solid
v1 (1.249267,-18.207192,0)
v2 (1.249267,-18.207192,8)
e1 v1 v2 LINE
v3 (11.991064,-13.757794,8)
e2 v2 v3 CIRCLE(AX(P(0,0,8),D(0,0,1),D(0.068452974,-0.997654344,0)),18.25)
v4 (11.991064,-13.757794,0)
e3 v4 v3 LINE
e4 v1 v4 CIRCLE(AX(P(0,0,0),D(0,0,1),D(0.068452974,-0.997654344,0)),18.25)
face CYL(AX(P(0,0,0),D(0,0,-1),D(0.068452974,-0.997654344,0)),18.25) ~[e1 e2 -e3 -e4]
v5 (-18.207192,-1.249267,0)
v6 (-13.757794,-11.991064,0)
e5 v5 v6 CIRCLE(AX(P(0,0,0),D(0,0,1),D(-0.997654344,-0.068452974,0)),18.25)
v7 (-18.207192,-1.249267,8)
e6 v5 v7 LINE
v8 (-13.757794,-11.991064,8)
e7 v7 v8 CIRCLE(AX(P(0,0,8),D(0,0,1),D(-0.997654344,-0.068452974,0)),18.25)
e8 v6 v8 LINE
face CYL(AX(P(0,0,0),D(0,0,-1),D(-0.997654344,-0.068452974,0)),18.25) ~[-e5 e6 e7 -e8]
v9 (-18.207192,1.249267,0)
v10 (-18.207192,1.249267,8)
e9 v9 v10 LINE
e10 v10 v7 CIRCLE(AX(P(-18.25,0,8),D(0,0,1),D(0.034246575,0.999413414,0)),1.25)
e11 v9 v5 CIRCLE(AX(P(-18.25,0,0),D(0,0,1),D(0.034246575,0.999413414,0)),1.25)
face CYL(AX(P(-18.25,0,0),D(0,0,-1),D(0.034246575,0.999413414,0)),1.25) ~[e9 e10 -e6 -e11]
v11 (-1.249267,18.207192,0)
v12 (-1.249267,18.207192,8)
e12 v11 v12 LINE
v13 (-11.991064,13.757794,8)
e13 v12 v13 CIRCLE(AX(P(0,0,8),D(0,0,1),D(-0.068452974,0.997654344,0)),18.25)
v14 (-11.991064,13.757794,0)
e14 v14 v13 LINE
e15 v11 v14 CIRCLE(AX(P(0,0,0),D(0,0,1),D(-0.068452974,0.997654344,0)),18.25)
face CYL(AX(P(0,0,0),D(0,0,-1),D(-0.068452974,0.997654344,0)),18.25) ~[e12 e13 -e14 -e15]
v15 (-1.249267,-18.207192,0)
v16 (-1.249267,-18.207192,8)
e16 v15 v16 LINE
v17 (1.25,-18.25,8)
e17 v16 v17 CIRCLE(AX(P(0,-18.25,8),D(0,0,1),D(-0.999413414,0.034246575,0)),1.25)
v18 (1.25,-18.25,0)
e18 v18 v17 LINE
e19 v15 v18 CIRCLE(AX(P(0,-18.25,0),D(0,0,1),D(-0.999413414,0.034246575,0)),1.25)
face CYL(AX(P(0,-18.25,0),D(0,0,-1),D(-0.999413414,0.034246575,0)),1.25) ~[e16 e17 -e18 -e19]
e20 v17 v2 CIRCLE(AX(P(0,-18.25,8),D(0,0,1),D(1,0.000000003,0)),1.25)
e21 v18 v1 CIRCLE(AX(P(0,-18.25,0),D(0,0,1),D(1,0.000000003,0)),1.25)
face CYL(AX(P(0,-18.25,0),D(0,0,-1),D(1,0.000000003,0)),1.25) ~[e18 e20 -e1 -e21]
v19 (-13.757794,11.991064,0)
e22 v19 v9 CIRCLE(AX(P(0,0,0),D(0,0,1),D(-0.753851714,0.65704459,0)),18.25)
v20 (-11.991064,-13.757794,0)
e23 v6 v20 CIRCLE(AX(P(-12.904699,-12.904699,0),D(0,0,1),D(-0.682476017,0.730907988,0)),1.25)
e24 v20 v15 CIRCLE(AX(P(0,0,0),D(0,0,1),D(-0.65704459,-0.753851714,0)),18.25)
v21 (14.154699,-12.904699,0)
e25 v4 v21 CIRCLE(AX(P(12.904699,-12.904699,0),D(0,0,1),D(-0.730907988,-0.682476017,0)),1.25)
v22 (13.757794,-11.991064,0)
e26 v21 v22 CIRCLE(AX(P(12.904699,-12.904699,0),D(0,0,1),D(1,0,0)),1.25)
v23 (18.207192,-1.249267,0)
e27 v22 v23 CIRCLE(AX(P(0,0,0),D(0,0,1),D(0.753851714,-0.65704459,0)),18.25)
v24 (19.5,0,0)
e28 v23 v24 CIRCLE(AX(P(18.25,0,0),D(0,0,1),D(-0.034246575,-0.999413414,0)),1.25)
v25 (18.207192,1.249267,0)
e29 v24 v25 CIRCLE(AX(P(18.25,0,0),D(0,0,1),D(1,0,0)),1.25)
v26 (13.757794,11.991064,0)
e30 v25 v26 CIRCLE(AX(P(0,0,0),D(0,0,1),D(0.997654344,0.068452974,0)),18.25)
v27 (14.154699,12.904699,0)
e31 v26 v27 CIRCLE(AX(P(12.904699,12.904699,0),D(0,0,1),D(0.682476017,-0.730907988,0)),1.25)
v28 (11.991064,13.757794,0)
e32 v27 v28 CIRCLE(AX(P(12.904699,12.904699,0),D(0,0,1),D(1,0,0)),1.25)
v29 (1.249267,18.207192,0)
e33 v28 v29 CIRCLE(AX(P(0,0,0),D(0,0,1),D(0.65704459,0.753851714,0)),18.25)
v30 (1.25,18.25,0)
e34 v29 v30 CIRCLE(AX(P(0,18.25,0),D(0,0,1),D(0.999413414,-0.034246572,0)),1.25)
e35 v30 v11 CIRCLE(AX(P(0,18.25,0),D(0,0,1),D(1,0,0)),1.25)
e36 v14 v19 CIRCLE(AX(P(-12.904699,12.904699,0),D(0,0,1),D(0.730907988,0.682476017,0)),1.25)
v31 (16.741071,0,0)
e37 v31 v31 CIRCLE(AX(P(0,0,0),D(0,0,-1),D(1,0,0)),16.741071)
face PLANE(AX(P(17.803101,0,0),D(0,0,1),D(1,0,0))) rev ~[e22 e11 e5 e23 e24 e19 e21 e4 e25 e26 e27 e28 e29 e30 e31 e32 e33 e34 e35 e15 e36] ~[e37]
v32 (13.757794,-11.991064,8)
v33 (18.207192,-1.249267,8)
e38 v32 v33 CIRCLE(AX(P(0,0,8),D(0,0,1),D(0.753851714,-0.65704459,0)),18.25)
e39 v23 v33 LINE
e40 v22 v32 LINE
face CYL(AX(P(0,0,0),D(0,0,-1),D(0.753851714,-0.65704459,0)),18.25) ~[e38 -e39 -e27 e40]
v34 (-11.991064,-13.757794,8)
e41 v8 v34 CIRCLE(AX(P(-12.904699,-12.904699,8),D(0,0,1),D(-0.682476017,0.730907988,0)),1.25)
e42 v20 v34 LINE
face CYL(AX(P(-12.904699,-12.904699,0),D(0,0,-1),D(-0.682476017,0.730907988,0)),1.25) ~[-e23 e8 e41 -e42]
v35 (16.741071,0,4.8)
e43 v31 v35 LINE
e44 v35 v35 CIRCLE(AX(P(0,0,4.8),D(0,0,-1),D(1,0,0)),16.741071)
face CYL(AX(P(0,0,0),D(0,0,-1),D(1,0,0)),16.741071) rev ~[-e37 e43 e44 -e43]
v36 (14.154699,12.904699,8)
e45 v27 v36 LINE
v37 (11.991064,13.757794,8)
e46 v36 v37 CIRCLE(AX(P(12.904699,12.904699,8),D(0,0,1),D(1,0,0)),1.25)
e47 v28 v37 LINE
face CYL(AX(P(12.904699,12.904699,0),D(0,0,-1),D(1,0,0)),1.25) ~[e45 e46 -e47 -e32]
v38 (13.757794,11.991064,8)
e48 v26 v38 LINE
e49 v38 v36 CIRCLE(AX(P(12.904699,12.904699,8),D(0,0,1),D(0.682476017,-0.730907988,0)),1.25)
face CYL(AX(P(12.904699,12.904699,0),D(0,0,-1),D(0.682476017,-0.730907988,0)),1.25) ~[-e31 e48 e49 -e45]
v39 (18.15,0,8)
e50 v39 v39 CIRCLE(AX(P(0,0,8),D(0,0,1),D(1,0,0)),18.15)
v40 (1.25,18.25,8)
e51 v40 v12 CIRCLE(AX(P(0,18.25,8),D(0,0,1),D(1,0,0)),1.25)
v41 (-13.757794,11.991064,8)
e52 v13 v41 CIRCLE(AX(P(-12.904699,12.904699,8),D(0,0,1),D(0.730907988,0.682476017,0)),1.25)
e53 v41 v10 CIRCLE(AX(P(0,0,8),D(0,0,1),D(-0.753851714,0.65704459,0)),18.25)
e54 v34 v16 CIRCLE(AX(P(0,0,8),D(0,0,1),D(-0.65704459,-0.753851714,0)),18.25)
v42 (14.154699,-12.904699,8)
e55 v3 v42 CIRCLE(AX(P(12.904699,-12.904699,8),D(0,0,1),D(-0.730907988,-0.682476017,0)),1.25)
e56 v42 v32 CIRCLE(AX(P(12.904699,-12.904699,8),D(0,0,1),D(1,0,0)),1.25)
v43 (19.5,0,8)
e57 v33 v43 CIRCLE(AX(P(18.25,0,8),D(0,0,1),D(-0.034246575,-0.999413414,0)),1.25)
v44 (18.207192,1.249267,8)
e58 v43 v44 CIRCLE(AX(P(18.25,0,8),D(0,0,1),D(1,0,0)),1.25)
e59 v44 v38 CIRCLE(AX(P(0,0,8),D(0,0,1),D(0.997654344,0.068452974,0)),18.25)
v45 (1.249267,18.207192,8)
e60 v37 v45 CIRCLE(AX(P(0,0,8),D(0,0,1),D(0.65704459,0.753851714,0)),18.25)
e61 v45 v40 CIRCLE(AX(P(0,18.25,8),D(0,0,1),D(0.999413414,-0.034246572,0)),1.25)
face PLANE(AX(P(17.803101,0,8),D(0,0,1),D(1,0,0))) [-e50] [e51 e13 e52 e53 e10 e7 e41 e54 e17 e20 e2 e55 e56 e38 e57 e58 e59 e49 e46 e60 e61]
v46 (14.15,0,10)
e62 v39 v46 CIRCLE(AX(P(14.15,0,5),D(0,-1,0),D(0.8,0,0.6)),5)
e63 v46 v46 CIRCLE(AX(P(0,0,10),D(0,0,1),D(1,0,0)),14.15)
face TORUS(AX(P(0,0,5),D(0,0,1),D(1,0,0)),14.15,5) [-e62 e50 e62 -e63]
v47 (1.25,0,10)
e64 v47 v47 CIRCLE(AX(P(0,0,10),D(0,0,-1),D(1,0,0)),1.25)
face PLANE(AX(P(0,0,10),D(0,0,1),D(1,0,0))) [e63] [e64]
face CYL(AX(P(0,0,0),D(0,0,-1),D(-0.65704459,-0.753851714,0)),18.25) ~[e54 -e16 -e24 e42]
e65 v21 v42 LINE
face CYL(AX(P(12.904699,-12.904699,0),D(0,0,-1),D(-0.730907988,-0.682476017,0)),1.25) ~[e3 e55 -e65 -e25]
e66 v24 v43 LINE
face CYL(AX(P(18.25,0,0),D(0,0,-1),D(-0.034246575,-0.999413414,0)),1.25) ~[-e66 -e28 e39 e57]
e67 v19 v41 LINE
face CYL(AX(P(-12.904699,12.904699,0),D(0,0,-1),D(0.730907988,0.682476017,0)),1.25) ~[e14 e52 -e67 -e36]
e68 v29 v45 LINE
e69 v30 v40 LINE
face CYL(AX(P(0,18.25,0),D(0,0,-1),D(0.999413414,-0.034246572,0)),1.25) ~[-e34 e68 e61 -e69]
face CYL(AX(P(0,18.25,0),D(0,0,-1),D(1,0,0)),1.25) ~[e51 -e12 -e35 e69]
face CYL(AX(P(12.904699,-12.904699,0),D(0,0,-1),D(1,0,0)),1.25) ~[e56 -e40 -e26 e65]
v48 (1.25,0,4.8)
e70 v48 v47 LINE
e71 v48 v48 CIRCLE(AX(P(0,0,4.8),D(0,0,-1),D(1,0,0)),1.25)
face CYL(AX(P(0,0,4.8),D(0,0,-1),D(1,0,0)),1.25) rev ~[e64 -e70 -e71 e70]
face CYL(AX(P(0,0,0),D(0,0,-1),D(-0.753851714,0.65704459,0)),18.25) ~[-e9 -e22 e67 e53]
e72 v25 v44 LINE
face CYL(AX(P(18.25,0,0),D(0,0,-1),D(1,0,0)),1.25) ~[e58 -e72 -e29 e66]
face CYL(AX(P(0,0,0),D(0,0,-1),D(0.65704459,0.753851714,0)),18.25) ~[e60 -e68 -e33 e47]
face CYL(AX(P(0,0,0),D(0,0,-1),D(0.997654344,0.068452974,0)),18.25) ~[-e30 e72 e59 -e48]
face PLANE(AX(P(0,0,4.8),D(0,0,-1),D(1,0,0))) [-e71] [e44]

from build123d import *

# Parameters (mm, degrees)
F1_DEPTH = 8
F2_R     = 16.7410714552
F3_DEPTH = 4.8
F4_R     = 18.15
F5_DEPTH = 2
F7_R     = 1.25
F8_DEPTH = 25


# Not quite as in the source:
# - a fillet or chamfer that OpenCascade refuses, or shapes differently, is made with other operations: its cross-section is extruded or revolved along the edge and cut away or added


with BuildPart() as f1:
    # F0 (on Top) → F1 (new body)
    with BuildSketch(Plane.XY):
        with BuildLine():
            ThreePointArc((18.2071917808, -1.2492667675), (18.2392948054, -0.625), (18.25, 0))
            ThreePointArc((18.25, 0), (18.2392948054, 0.625), (18.2071917808, 1.2492667675))
            ThreePointArc((18.2071917808, 1.2492667675), (17, 0), (18.2071917808, -1.2492667675))
        make_face()
        with BuildLine():
            ThreePointArc((18.2071917808, 1.2492667675), (18.2392948054, 0.625), (18.25, 0))
            ThreePointArc((18.25, 0), (18.2392948054, -0.625), (18.2071917808, -1.2492667675))
            ThreePointArc((18.2071917808, -1.2492667675), (19.1186166375, -0.8988910596), (19.5, 0))
            ThreePointArc((19.5, 0), (19.1186166375, 0.8988910596), (18.2071917808, 1.2492667675))
        make_face()
        with BuildLine():
            ThreePointArc((18.2071917808, -1.2492667675), (17, 0), (18.2071917808, 1.2492667675))
            ThreePointArc((18.2071917808, 1.2492667675), (16.8608014683, 6.9839726407), (13.7577937774, 11.9910637718))
            ThreePointArc((13.7577937774, 11.9910637718), (12.0208152802, 12.0208152802), (11.9910637718, 13.7577937774))
            ThreePointArc((11.9910637718, 13.7577937774), (6.9839726407, 16.8608014683), (1.2492667675, 18.2071917808))
            ThreePointArc((1.2492667675, 18.2071917808), (0, 17), (-1.2492667675, 18.2071917808))
            ThreePointArc((-1.2492667675, 18.2071917808), (-6.9839726407, 16.8608014683), (-11.9910637718, 13.7577937774))
            ThreePointArc((-11.9910637718, 13.7577937774), (-11.7418265085, 13.3632051737), (-11.6546987567, 12.9046987567))
            ThreePointArc((-11.6546987567, 12.9046987567), (-12.406636901, 11.7582109076), (-13.7577937774, 11.9910637718))
            ThreePointArc((-13.7577937774, 11.9910637718), (-16.8608014683, 6.9839726407), (-18.2071917808, 1.2492667675))
            ThreePointArc((-18.2071917808, 1.2492667675), (-17.3511089404, 0.8686166375), (-17, 0))
            ThreePointArc((-17, 0), (-17.3511089404, -0.8686166375), (-18.2071917808, -1.2492667675))
            ThreePointArc((-18.2071917808, -1.2492667675), (-16.8608014683, -6.9839726407), (-13.7577937774, -11.9910637718))
            ThreePointArc((-13.7577937774, -11.9910637718), (-12.406636901, -11.7582109076), (-11.6546987567, -12.9046987567))
            ThreePointArc((-11.6546987567, -12.9046987567), (-11.7418265085, -13.3632051737), (-11.9910637718, -13.7577937774))
            ThreePointArc((-11.9910637718, -13.7577937774), (-6.9839726407, -16.8608014683), (-1.2492667675, -18.2071917808))
            ThreePointArc((-1.2492667675, -18.2071917808), (0, -17), (1.2492667675, -18.2071917808))
            ThreePointArc((1.2492667675, -18.2071917808), (6.9839726407, -16.8608014683), (11.9910637718, -13.7577937774))
            ThreePointArc((11.9910637718, -13.7577937774), (12.0208152802, -12.0208152802), (13.7577937774, -11.9910637718))
            ThreePointArc((13.7577937774, -11.9910637718), (16.8608014683, -6.9839726407), (18.2071917808, -1.2492667675))
        make_face()
        with BuildLine():
            ThreePointArc((11.9910637718, 13.7577937774), (12.0208152802, 12.0208152802), (13.7577937774, 11.9910637718))
            ThreePointArc((13.7577937774, 11.9910637718), (12.9046987567, 12.9046987567), (11.9910637718, 13.7577937774))
        make_face()
        with BuildLine():
            ThreePointArc((11.9910637718, 13.7577937774), (12.9046987567, 12.9046987567), (13.7577937774, 11.9910637718))
            ThreePointArc((13.7577937774, 11.9910637718), (14.0511866057, 12.406636901), (14.1546987567, 12.9046987567))
            ThreePointArc((14.1546987567, 12.9046987567), (13.3632051737, 14.0675710048), (11.9910637718, 13.7577937774))
        make_face()
        with BuildLine():
            ThreePointArc((14.1546987567, -12.9046987567), (14.0511866057, -12.406636901), (13.7577937774, -11.9910637718))
            ThreePointArc((13.7577937774, -11.9910637718), (12.9046987567, -12.9046987567), (11.9910637718, -13.7577937774))
            ThreePointArc((11.9910637718, -13.7577937774), (13.3632051737, -14.0675710048), (14.1546987567, -12.9046987567))
        make_face()
        with BuildLine():
            ThreePointArc((11.9910637718, -13.7577937774), (12.9046987567, -12.9046987567), (13.7577937774, -11.9910637718))
            ThreePointArc((13.7577937774, -11.9910637718), (12.0208152802, -12.0208152802), (11.9910637718, -13.7577937774))
        make_face()
        with BuildLine():
            ThreePointArc((-1.2492667675, 18.2071917808), (0, 17), (1.2492667675, 18.2071917808))
            ThreePointArc((1.2492667675, 18.2071917808), (0, 18.25), (-1.2492667675, 18.2071917808))
        make_face()
        with BuildLine():
            ThreePointArc((-1.2492667675, 18.2071917808), (0, 18.25), (1.2492667675, 18.2071917808))
            ThreePointArc((1.2492667675, 18.2071917808), (1.2498166784, 18.2285927509), (1.25, 18.25))
            ThreePointArc((1.25, 18.25), (-0.0214072491, 19.4998166784), (-1.2492667675, 18.2071917808))
        make_face()
        with BuildLine():
            ThreePointArc((1.25, -18.25), (1.2498166784, -18.2285927509), (1.2492667675, -18.2071917808))
            ThreePointArc((1.2492667675, -18.2071917808), (0, -18.25), (-1.2492667675, -18.2071917808))
            ThreePointArc((-1.2492667675, -18.2071917808), (-0.0214072491, -19.4998166784), (1.25, -18.25))
        make_face()
        with BuildLine():
            ThreePointArc((-1.2492667675, -18.2071917808), (0, -18.25), (1.2492667675, -18.2071917808))
            ThreePointArc((1.2492667675, -18.2071917808), (0, -17), (-1.2492667675, -18.2071917808))
        make_face()
        with BuildLine():
            ThreePointArc((-11.6546987567, 12.9046987567), (-11.7418265085, 13.3632051737), (-11.9910637718, 13.7577937774))
            ThreePointArc((-11.9910637718, 13.7577937774), (-12.9046987567, 12.9046987567), (-13.7577937774, 11.9910637718))
            ThreePointArc((-13.7577937774, 11.9910637718), (-12.406636901, 11.7582109076), (-11.6546987567, 12.9046987567))
        make_face()
        with BuildLine():
            ThreePointArc((-13.7577937774, 11.9910637718), (-12.9046987567, 12.9046987567), (-11.9910637718, 13.7577937774))
            ThreePointArc((-11.9910637718, 13.7577937774), (-13.7885822331, 13.7885822331), (-13.7577937774, 11.9910637718))
        make_face()
        with BuildLine():
            ThreePointArc((-13.7577937774, -11.9910637718), (-13.7885822331, -13.7885822331), (-11.9910637718, -13.7577937774))
            ThreePointArc((-11.9910637718, -13.7577937774), (-12.9046987567, -12.9046987567), (-13.7577937774, -11.9910637718))
        make_face()
        with BuildLine():
            ThreePointArc((-13.7577937774, -11.9910637718), (-12.9046987567, -12.9046987567), (-11.9910637718, -13.7577937774))
            ThreePointArc((-11.9910637718, -13.7577937774), (-11.7418265085, -13.3632051737), (-11.6546987567, -12.9046987567))
            ThreePointArc((-11.6546987567, -12.9046987567), (-12.406636901, -11.7582109076), (-13.7577937774, -11.9910637718))
        make_face()
        with BuildLine():
            ThreePointArc((-17, 0), (-17.3511089404, 0.8686166375), (-18.2071917808, 1.2492667675))
            ThreePointArc((-18.2071917808, 1.2492667675), (-18.25, 0), (-18.2071917808, -1.2492667675))
            ThreePointArc((-18.2071917808, -1.2492667675), (-17.3511089404, -0.8686166375), (-17, 0))
        make_face()
        with BuildLine():
            ThreePointArc((-18.2071917808, -1.2492667675), (-18.25, 0), (-18.2071917808, 1.2492667675))
            ThreePointArc((-18.2071917808, 1.2492667675), (-19.5, 0), (-18.2071917808, -1.2492667675))
        make_face()
    extrude(amount=F1_DEPTH)

    # F2 (on face) → F3 (cut)
    with BuildSketch(Plane(origin=(0, 0, 0), x_dir=(1, 0, 0), z_dir=(0, 0, -1))):
        Circle(F2_R)
    extrude(amount=-F3_DEPTH, mode=Mode.SUBTRACT)

    # F4 (on face) → F5 (join)
    with BuildSketch(Plane.XY.offset(8)):
        Circle(F4_R)
    extrude(amount=F5_DEPTH)

    # F6: fillet of radius 5 on 1 edges, made by hand

    # F6_s1 → F6_t2 (revolve, cut)
    with BuildSketch(Plane.XZ):
        with BuildLine():
            ThreePointArc((18.15, 8), (16.3860679775, 9.472135955), (14.15, 10))
            Line((14.15, 10), (18.15, 10))
            Line((18.15, 10), (18.15, 8))
        make_face()
    revolve(axis=Axis((0, 0, 10), (0, 0, 1)), mode=Mode.SUBTRACT)

    # F7 (on face) → F8 (cut)
    with BuildSketch(Plane(origin=(0, 0, 4.8), x_dir=(1, 0, 0), z_dir=(0, 0, -1))):
        Circle(F7_R)
    extrude(amount=-F8_DEPTH, mode=Mode.SUBTRACT)


solid = f1.part
